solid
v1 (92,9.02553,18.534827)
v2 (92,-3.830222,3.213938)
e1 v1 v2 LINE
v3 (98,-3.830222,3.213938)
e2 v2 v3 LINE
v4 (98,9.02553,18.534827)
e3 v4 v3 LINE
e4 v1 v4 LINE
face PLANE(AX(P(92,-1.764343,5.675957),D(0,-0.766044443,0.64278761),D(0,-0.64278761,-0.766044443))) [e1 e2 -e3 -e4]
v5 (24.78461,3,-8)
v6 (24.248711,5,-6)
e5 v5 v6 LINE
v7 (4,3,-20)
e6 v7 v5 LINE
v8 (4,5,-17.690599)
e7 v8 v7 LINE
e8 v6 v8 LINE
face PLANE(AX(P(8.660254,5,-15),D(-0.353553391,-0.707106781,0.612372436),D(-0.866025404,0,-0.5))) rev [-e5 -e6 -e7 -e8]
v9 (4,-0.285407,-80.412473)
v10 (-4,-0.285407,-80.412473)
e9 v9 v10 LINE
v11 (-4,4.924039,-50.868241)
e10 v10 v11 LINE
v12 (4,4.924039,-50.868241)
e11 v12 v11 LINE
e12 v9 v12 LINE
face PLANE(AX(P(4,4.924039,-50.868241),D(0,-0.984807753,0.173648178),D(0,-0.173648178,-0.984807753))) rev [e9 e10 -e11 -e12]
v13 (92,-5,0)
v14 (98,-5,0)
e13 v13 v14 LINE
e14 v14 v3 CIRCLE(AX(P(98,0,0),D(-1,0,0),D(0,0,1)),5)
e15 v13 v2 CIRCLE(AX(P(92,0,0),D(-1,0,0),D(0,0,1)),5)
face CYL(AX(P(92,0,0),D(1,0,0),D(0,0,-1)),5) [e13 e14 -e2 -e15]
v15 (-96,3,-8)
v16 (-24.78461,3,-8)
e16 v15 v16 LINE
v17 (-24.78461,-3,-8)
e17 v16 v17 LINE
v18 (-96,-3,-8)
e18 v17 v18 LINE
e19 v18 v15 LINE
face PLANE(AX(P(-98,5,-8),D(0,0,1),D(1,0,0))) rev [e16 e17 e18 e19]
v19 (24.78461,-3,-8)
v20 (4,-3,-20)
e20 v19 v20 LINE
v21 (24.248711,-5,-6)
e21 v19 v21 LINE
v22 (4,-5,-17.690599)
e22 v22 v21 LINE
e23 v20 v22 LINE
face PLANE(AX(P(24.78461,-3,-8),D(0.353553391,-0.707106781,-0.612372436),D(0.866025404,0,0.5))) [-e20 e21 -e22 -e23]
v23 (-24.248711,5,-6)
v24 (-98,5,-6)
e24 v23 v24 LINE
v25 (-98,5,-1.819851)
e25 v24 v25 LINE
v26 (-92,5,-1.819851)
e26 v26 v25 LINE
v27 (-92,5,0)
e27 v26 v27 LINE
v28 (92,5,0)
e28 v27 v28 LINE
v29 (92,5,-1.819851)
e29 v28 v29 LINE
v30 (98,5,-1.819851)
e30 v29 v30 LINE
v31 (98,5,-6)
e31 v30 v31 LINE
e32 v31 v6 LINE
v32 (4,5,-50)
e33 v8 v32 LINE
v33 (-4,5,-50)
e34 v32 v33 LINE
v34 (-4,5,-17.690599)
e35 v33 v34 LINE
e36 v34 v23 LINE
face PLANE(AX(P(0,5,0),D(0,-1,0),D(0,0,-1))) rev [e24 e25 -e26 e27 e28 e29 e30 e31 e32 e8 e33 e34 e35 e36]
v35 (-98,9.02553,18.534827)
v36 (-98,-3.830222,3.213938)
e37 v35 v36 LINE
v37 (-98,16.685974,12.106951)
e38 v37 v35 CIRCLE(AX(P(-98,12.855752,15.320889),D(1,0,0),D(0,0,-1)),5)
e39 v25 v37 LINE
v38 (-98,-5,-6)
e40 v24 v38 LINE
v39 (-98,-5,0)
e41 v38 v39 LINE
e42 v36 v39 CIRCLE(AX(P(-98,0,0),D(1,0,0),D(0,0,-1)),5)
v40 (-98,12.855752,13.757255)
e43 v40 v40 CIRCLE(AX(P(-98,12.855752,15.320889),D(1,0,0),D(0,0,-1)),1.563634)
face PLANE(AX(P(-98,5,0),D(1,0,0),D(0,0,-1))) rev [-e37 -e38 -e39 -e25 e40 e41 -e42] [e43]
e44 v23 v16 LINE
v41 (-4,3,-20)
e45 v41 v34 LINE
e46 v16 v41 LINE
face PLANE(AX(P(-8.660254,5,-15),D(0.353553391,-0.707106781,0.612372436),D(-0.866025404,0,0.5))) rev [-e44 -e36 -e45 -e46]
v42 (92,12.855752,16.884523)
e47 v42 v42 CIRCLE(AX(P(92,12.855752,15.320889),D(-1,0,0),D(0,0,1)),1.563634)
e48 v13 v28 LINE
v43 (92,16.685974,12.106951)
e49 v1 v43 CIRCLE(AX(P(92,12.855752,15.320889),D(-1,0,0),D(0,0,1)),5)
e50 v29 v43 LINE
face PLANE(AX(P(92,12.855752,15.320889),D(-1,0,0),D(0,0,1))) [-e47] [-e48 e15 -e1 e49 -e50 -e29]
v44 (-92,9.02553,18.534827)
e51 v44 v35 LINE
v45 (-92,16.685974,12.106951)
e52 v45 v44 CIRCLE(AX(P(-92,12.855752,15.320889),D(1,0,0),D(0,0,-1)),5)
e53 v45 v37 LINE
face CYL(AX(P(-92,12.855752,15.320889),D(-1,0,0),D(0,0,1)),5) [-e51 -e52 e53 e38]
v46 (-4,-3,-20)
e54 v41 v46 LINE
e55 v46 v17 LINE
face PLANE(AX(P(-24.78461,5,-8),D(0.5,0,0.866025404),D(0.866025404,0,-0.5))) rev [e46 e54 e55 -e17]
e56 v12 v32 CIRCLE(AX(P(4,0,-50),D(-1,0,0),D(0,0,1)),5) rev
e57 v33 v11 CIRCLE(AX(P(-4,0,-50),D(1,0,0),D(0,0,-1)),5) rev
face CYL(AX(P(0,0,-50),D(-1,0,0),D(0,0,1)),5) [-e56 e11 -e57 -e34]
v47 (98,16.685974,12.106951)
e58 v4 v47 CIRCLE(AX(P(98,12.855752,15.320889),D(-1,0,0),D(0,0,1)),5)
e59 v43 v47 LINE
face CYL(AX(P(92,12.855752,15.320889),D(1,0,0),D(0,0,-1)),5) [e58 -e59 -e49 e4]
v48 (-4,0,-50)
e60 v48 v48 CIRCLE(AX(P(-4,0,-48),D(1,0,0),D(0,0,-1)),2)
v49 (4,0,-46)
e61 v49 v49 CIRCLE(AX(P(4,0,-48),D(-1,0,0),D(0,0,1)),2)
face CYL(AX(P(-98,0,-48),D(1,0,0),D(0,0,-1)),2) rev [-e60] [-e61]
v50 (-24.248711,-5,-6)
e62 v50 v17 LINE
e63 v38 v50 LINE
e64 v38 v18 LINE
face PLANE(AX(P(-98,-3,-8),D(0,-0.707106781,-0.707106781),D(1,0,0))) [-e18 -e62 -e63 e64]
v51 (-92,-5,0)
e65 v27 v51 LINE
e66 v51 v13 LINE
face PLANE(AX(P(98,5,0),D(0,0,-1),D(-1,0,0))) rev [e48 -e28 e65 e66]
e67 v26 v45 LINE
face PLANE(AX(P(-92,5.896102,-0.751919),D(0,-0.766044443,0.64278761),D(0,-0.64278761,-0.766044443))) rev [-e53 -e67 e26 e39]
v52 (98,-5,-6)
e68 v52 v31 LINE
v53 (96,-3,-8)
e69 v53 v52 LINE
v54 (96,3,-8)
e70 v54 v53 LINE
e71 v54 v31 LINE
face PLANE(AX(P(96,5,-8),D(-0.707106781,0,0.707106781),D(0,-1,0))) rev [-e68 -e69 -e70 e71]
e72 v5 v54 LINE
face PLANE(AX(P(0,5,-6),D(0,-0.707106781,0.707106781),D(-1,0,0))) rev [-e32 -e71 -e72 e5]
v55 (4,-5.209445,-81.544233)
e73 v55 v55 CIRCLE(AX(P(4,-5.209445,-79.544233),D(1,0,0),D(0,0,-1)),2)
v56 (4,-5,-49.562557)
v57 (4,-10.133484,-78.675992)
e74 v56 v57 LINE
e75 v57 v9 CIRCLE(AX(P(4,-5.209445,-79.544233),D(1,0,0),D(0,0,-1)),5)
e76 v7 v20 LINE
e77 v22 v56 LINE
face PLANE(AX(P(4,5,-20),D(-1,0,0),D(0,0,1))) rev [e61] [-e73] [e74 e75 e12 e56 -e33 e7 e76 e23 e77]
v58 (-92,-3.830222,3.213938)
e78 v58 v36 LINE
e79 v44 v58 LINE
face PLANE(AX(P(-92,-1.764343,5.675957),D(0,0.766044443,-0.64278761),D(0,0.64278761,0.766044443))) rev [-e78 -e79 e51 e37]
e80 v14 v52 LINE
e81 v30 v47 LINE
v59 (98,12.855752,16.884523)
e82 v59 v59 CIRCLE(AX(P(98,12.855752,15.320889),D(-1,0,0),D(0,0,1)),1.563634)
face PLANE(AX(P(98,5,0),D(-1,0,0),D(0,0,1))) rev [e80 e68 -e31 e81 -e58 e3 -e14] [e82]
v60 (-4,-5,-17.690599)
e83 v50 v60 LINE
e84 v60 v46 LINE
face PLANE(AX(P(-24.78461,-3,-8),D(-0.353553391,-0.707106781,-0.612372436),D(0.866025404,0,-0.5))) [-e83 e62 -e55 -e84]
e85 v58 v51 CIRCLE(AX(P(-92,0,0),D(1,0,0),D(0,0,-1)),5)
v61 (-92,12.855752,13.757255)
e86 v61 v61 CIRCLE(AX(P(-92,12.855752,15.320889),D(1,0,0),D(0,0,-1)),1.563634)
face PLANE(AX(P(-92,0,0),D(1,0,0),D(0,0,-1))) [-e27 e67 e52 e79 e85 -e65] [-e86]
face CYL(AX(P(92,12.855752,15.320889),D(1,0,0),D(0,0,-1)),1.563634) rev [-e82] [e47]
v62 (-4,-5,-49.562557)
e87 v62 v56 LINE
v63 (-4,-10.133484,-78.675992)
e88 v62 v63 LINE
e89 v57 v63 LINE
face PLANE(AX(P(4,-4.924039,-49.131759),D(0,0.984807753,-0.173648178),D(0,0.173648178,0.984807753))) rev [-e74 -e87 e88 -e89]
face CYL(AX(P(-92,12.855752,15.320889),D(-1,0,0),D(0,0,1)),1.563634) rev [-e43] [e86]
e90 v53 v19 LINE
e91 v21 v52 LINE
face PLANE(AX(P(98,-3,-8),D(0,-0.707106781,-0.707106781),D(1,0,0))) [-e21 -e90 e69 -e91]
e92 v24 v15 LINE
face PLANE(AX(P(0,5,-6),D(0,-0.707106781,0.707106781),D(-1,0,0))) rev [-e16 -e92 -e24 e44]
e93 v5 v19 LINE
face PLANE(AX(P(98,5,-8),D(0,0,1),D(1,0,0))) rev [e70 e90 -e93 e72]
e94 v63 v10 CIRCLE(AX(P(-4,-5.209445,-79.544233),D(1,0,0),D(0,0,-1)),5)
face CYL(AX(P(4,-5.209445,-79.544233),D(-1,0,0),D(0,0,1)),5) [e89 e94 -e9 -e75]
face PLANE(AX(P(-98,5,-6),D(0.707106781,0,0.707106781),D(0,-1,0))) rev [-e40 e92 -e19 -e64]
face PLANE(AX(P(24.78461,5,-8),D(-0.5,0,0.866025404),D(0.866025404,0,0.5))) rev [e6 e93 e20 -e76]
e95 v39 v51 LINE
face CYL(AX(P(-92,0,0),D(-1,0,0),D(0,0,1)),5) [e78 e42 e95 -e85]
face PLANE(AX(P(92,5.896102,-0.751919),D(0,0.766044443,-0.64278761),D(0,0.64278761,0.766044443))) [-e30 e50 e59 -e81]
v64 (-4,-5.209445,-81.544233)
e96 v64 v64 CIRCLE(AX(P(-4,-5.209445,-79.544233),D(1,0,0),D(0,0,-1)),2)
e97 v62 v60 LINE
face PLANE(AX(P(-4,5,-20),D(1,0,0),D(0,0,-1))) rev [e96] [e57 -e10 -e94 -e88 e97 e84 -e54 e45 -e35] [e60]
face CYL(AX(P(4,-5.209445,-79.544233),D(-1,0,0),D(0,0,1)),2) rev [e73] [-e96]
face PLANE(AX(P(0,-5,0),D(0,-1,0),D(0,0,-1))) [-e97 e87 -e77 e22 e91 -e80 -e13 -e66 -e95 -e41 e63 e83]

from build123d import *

# Parameters (mm, degrees)
EXTRUDE_1_DEPTH          = 5
FILLET_1_R               = 5
EXTRUDE_START            = 98
SKETCH_9_R               = 1.563633766
EXTRUDE_4_DEPTH          = 6
EXTRUDE_START_2          = -92
SKETCH_9_2_R             = 1.563633766
EXTRUDE_5_DEPTH          = 6
SKETCH_10_R              = 2
EXTRUDE_6_DEPTH          = 4
CUT_EXTRUDE_1_DEPTH      = 131.654334604
CUT_EXTRUDE_1_DEPTH_BACK = 131.654334604
SKETCH_11_R              = 2
CHAMFER_1_SIZE           = 2


with BuildPart() as part:
    # 草图1 → 凸台-拉伸1 (new, symmetric)
    with BuildSketch(Plane(origin=(0, 0, 0), x_dir=(1, 0, 0), z_dir=(0, 1, 0))):
        Polygon((98, 0), (-98, 0), (-98, 8), (-24.784609691, 8), (-4, 20), (-4, 55), (4, 55), (4, 20), (24.784609691, 8), (98, 8), align=None)
    extrude(amount=EXTRUDE_1_DEPTH, both=True)

    # 圆角1
    fillet_1_edges = [part.edges().sort_by_distance(p)[0] for p in [
        (0, -5, -55),
        (0, 5, -55),
    ]]
    fillet(fillet_1_edges, radius=FILLET_1_R - 0.0001)  # a hair under: the kernel refuses the full size

    # 草图9 → 凸台-拉伸4 (add)
    with BuildSketch(Plane(origin=(0, 0, 0), x_dir=(0, 0, -1), z_dir=(1, 0, 0)).offset(EXTRUDE_START)):
        with BuildLine():
            Line((3.213938048, 3.830222216), (-12.106950814, 16.685974409))
            ThreePointArc((-12.106950814, 16.685974409), (-19.151111078, 16.069690242), (-18.534826911, 9.025529978))
            Line((-18.534826911, 9.025529978), (-3.213938048, -3.830222216))
            ThreePointArc((-3.213938048, -3.830222216), (3.830222216, -3.213938048), (3.213938048, 3.830222216))
        make_face()
        with Locations(Location((-15.320888862, 12.855752194, 0), (0, 0, 180))):
            Circle(SKETCH_9_R, mode=Mode.SUBTRACT)
    extrude(amount=-EXTRUDE_4_DEPTH)

    # 草图9<2> → 凸台-拉伸5 (add)
    with BuildSketch(Plane(origin=(0, 0, 0), x_dir=(0, 0, -1), z_dir=(1, 0, 0)).offset(EXTRUDE_START_2)):
        with BuildLine():
            Line((3.213938048, 3.830222216), (-12.106950814, 16.685974409))
            ThreePointArc((-12.106950814, 16.685974409), (-19.151111078, 16.069690242), (-18.534826911, 9.025529978))
            Line((-18.534826911, 9.025529978), (-3.213938048, -3.830222216))
            ThreePointArc((-3.213938048, -3.830222216), (3.830222216, -3.213938048), (3.213938048, 3.830222216))
        make_face()
        with Locations(Location((-15.320888862, 12.855752194, 0), (0, 0, 180))):
            Circle(SKETCH_9_2_R, mode=Mode.SUBTRACT)
    extrude(amount=-EXTRUDE_5_DEPTH)

    # 草图10 → 凸台-拉伸6 (add, symmetric)
    with BuildSketch(Plane(origin=(0, 0, 0), x_dir=(0, 0, -1), z_dir=(1, 0, 0))):
        with BuildLine():
            Line((50.868240888, 4.924038765), (80.412473479, -0.285406565))
            ThreePointArc((80.412473479, -0.285406565), (84.468271355, -6.077686218), (78.675991702, -10.133484095))
            Line((78.675991702, -10.133484095), (49.131759112, -4.924038765))
            ThreePointArc((49.131759112, -4.924038765), (45.075961235, 0.868240888), (50.868240888, 4.924038765))
        make_face()
        with Locations((79.54423259, -5.20944533)):
            Circle(SKETCH_10_R, mode=Mode.SUBTRACT)
    extrude(amount=EXTRUDE_6_DEPTH, both=True)

    # 草图11 → 切除-拉伸1 (cut, two sides: drawn at the far end of the back side and taken through both)
    with BuildSketch(Plane(origin=(0, 0, 0), x_dir=(0, 0, -1), z_dir=(1, 0, 0)).offset(-CUT_EXTRUDE_1_DEPTH_BACK)):
        with Locations((48, 0)):
            Circle(SKETCH_11_R)
    extrude(amount=CUT_EXTRUDE_1_DEPTH + CUT_EXTRUDE_1_DEPTH_BACK, mode=Mode.SUBTRACT)

    # 倒角1
    chamfer_1_edges = [part.edges().sort_by_distance(p)[0] for p in [
        (-61.392304845, -5, -8),
        (-14.392304845, -5, -14),
        (14.392304845, -5, -14),
        (61.392304845, -5, -8),
        (61.392304845, 5, -8),
        (-98, 0, -8),
        (98, 0, -8),
        (14.392304845, 5, -14),
        (-14.392304845, 5, -14),
        (-61.392304845, 5, -8),
    ]]
    chamfer(chamfer_1_edges, length=CHAMFER_1_SIZE)


solid = part.part
